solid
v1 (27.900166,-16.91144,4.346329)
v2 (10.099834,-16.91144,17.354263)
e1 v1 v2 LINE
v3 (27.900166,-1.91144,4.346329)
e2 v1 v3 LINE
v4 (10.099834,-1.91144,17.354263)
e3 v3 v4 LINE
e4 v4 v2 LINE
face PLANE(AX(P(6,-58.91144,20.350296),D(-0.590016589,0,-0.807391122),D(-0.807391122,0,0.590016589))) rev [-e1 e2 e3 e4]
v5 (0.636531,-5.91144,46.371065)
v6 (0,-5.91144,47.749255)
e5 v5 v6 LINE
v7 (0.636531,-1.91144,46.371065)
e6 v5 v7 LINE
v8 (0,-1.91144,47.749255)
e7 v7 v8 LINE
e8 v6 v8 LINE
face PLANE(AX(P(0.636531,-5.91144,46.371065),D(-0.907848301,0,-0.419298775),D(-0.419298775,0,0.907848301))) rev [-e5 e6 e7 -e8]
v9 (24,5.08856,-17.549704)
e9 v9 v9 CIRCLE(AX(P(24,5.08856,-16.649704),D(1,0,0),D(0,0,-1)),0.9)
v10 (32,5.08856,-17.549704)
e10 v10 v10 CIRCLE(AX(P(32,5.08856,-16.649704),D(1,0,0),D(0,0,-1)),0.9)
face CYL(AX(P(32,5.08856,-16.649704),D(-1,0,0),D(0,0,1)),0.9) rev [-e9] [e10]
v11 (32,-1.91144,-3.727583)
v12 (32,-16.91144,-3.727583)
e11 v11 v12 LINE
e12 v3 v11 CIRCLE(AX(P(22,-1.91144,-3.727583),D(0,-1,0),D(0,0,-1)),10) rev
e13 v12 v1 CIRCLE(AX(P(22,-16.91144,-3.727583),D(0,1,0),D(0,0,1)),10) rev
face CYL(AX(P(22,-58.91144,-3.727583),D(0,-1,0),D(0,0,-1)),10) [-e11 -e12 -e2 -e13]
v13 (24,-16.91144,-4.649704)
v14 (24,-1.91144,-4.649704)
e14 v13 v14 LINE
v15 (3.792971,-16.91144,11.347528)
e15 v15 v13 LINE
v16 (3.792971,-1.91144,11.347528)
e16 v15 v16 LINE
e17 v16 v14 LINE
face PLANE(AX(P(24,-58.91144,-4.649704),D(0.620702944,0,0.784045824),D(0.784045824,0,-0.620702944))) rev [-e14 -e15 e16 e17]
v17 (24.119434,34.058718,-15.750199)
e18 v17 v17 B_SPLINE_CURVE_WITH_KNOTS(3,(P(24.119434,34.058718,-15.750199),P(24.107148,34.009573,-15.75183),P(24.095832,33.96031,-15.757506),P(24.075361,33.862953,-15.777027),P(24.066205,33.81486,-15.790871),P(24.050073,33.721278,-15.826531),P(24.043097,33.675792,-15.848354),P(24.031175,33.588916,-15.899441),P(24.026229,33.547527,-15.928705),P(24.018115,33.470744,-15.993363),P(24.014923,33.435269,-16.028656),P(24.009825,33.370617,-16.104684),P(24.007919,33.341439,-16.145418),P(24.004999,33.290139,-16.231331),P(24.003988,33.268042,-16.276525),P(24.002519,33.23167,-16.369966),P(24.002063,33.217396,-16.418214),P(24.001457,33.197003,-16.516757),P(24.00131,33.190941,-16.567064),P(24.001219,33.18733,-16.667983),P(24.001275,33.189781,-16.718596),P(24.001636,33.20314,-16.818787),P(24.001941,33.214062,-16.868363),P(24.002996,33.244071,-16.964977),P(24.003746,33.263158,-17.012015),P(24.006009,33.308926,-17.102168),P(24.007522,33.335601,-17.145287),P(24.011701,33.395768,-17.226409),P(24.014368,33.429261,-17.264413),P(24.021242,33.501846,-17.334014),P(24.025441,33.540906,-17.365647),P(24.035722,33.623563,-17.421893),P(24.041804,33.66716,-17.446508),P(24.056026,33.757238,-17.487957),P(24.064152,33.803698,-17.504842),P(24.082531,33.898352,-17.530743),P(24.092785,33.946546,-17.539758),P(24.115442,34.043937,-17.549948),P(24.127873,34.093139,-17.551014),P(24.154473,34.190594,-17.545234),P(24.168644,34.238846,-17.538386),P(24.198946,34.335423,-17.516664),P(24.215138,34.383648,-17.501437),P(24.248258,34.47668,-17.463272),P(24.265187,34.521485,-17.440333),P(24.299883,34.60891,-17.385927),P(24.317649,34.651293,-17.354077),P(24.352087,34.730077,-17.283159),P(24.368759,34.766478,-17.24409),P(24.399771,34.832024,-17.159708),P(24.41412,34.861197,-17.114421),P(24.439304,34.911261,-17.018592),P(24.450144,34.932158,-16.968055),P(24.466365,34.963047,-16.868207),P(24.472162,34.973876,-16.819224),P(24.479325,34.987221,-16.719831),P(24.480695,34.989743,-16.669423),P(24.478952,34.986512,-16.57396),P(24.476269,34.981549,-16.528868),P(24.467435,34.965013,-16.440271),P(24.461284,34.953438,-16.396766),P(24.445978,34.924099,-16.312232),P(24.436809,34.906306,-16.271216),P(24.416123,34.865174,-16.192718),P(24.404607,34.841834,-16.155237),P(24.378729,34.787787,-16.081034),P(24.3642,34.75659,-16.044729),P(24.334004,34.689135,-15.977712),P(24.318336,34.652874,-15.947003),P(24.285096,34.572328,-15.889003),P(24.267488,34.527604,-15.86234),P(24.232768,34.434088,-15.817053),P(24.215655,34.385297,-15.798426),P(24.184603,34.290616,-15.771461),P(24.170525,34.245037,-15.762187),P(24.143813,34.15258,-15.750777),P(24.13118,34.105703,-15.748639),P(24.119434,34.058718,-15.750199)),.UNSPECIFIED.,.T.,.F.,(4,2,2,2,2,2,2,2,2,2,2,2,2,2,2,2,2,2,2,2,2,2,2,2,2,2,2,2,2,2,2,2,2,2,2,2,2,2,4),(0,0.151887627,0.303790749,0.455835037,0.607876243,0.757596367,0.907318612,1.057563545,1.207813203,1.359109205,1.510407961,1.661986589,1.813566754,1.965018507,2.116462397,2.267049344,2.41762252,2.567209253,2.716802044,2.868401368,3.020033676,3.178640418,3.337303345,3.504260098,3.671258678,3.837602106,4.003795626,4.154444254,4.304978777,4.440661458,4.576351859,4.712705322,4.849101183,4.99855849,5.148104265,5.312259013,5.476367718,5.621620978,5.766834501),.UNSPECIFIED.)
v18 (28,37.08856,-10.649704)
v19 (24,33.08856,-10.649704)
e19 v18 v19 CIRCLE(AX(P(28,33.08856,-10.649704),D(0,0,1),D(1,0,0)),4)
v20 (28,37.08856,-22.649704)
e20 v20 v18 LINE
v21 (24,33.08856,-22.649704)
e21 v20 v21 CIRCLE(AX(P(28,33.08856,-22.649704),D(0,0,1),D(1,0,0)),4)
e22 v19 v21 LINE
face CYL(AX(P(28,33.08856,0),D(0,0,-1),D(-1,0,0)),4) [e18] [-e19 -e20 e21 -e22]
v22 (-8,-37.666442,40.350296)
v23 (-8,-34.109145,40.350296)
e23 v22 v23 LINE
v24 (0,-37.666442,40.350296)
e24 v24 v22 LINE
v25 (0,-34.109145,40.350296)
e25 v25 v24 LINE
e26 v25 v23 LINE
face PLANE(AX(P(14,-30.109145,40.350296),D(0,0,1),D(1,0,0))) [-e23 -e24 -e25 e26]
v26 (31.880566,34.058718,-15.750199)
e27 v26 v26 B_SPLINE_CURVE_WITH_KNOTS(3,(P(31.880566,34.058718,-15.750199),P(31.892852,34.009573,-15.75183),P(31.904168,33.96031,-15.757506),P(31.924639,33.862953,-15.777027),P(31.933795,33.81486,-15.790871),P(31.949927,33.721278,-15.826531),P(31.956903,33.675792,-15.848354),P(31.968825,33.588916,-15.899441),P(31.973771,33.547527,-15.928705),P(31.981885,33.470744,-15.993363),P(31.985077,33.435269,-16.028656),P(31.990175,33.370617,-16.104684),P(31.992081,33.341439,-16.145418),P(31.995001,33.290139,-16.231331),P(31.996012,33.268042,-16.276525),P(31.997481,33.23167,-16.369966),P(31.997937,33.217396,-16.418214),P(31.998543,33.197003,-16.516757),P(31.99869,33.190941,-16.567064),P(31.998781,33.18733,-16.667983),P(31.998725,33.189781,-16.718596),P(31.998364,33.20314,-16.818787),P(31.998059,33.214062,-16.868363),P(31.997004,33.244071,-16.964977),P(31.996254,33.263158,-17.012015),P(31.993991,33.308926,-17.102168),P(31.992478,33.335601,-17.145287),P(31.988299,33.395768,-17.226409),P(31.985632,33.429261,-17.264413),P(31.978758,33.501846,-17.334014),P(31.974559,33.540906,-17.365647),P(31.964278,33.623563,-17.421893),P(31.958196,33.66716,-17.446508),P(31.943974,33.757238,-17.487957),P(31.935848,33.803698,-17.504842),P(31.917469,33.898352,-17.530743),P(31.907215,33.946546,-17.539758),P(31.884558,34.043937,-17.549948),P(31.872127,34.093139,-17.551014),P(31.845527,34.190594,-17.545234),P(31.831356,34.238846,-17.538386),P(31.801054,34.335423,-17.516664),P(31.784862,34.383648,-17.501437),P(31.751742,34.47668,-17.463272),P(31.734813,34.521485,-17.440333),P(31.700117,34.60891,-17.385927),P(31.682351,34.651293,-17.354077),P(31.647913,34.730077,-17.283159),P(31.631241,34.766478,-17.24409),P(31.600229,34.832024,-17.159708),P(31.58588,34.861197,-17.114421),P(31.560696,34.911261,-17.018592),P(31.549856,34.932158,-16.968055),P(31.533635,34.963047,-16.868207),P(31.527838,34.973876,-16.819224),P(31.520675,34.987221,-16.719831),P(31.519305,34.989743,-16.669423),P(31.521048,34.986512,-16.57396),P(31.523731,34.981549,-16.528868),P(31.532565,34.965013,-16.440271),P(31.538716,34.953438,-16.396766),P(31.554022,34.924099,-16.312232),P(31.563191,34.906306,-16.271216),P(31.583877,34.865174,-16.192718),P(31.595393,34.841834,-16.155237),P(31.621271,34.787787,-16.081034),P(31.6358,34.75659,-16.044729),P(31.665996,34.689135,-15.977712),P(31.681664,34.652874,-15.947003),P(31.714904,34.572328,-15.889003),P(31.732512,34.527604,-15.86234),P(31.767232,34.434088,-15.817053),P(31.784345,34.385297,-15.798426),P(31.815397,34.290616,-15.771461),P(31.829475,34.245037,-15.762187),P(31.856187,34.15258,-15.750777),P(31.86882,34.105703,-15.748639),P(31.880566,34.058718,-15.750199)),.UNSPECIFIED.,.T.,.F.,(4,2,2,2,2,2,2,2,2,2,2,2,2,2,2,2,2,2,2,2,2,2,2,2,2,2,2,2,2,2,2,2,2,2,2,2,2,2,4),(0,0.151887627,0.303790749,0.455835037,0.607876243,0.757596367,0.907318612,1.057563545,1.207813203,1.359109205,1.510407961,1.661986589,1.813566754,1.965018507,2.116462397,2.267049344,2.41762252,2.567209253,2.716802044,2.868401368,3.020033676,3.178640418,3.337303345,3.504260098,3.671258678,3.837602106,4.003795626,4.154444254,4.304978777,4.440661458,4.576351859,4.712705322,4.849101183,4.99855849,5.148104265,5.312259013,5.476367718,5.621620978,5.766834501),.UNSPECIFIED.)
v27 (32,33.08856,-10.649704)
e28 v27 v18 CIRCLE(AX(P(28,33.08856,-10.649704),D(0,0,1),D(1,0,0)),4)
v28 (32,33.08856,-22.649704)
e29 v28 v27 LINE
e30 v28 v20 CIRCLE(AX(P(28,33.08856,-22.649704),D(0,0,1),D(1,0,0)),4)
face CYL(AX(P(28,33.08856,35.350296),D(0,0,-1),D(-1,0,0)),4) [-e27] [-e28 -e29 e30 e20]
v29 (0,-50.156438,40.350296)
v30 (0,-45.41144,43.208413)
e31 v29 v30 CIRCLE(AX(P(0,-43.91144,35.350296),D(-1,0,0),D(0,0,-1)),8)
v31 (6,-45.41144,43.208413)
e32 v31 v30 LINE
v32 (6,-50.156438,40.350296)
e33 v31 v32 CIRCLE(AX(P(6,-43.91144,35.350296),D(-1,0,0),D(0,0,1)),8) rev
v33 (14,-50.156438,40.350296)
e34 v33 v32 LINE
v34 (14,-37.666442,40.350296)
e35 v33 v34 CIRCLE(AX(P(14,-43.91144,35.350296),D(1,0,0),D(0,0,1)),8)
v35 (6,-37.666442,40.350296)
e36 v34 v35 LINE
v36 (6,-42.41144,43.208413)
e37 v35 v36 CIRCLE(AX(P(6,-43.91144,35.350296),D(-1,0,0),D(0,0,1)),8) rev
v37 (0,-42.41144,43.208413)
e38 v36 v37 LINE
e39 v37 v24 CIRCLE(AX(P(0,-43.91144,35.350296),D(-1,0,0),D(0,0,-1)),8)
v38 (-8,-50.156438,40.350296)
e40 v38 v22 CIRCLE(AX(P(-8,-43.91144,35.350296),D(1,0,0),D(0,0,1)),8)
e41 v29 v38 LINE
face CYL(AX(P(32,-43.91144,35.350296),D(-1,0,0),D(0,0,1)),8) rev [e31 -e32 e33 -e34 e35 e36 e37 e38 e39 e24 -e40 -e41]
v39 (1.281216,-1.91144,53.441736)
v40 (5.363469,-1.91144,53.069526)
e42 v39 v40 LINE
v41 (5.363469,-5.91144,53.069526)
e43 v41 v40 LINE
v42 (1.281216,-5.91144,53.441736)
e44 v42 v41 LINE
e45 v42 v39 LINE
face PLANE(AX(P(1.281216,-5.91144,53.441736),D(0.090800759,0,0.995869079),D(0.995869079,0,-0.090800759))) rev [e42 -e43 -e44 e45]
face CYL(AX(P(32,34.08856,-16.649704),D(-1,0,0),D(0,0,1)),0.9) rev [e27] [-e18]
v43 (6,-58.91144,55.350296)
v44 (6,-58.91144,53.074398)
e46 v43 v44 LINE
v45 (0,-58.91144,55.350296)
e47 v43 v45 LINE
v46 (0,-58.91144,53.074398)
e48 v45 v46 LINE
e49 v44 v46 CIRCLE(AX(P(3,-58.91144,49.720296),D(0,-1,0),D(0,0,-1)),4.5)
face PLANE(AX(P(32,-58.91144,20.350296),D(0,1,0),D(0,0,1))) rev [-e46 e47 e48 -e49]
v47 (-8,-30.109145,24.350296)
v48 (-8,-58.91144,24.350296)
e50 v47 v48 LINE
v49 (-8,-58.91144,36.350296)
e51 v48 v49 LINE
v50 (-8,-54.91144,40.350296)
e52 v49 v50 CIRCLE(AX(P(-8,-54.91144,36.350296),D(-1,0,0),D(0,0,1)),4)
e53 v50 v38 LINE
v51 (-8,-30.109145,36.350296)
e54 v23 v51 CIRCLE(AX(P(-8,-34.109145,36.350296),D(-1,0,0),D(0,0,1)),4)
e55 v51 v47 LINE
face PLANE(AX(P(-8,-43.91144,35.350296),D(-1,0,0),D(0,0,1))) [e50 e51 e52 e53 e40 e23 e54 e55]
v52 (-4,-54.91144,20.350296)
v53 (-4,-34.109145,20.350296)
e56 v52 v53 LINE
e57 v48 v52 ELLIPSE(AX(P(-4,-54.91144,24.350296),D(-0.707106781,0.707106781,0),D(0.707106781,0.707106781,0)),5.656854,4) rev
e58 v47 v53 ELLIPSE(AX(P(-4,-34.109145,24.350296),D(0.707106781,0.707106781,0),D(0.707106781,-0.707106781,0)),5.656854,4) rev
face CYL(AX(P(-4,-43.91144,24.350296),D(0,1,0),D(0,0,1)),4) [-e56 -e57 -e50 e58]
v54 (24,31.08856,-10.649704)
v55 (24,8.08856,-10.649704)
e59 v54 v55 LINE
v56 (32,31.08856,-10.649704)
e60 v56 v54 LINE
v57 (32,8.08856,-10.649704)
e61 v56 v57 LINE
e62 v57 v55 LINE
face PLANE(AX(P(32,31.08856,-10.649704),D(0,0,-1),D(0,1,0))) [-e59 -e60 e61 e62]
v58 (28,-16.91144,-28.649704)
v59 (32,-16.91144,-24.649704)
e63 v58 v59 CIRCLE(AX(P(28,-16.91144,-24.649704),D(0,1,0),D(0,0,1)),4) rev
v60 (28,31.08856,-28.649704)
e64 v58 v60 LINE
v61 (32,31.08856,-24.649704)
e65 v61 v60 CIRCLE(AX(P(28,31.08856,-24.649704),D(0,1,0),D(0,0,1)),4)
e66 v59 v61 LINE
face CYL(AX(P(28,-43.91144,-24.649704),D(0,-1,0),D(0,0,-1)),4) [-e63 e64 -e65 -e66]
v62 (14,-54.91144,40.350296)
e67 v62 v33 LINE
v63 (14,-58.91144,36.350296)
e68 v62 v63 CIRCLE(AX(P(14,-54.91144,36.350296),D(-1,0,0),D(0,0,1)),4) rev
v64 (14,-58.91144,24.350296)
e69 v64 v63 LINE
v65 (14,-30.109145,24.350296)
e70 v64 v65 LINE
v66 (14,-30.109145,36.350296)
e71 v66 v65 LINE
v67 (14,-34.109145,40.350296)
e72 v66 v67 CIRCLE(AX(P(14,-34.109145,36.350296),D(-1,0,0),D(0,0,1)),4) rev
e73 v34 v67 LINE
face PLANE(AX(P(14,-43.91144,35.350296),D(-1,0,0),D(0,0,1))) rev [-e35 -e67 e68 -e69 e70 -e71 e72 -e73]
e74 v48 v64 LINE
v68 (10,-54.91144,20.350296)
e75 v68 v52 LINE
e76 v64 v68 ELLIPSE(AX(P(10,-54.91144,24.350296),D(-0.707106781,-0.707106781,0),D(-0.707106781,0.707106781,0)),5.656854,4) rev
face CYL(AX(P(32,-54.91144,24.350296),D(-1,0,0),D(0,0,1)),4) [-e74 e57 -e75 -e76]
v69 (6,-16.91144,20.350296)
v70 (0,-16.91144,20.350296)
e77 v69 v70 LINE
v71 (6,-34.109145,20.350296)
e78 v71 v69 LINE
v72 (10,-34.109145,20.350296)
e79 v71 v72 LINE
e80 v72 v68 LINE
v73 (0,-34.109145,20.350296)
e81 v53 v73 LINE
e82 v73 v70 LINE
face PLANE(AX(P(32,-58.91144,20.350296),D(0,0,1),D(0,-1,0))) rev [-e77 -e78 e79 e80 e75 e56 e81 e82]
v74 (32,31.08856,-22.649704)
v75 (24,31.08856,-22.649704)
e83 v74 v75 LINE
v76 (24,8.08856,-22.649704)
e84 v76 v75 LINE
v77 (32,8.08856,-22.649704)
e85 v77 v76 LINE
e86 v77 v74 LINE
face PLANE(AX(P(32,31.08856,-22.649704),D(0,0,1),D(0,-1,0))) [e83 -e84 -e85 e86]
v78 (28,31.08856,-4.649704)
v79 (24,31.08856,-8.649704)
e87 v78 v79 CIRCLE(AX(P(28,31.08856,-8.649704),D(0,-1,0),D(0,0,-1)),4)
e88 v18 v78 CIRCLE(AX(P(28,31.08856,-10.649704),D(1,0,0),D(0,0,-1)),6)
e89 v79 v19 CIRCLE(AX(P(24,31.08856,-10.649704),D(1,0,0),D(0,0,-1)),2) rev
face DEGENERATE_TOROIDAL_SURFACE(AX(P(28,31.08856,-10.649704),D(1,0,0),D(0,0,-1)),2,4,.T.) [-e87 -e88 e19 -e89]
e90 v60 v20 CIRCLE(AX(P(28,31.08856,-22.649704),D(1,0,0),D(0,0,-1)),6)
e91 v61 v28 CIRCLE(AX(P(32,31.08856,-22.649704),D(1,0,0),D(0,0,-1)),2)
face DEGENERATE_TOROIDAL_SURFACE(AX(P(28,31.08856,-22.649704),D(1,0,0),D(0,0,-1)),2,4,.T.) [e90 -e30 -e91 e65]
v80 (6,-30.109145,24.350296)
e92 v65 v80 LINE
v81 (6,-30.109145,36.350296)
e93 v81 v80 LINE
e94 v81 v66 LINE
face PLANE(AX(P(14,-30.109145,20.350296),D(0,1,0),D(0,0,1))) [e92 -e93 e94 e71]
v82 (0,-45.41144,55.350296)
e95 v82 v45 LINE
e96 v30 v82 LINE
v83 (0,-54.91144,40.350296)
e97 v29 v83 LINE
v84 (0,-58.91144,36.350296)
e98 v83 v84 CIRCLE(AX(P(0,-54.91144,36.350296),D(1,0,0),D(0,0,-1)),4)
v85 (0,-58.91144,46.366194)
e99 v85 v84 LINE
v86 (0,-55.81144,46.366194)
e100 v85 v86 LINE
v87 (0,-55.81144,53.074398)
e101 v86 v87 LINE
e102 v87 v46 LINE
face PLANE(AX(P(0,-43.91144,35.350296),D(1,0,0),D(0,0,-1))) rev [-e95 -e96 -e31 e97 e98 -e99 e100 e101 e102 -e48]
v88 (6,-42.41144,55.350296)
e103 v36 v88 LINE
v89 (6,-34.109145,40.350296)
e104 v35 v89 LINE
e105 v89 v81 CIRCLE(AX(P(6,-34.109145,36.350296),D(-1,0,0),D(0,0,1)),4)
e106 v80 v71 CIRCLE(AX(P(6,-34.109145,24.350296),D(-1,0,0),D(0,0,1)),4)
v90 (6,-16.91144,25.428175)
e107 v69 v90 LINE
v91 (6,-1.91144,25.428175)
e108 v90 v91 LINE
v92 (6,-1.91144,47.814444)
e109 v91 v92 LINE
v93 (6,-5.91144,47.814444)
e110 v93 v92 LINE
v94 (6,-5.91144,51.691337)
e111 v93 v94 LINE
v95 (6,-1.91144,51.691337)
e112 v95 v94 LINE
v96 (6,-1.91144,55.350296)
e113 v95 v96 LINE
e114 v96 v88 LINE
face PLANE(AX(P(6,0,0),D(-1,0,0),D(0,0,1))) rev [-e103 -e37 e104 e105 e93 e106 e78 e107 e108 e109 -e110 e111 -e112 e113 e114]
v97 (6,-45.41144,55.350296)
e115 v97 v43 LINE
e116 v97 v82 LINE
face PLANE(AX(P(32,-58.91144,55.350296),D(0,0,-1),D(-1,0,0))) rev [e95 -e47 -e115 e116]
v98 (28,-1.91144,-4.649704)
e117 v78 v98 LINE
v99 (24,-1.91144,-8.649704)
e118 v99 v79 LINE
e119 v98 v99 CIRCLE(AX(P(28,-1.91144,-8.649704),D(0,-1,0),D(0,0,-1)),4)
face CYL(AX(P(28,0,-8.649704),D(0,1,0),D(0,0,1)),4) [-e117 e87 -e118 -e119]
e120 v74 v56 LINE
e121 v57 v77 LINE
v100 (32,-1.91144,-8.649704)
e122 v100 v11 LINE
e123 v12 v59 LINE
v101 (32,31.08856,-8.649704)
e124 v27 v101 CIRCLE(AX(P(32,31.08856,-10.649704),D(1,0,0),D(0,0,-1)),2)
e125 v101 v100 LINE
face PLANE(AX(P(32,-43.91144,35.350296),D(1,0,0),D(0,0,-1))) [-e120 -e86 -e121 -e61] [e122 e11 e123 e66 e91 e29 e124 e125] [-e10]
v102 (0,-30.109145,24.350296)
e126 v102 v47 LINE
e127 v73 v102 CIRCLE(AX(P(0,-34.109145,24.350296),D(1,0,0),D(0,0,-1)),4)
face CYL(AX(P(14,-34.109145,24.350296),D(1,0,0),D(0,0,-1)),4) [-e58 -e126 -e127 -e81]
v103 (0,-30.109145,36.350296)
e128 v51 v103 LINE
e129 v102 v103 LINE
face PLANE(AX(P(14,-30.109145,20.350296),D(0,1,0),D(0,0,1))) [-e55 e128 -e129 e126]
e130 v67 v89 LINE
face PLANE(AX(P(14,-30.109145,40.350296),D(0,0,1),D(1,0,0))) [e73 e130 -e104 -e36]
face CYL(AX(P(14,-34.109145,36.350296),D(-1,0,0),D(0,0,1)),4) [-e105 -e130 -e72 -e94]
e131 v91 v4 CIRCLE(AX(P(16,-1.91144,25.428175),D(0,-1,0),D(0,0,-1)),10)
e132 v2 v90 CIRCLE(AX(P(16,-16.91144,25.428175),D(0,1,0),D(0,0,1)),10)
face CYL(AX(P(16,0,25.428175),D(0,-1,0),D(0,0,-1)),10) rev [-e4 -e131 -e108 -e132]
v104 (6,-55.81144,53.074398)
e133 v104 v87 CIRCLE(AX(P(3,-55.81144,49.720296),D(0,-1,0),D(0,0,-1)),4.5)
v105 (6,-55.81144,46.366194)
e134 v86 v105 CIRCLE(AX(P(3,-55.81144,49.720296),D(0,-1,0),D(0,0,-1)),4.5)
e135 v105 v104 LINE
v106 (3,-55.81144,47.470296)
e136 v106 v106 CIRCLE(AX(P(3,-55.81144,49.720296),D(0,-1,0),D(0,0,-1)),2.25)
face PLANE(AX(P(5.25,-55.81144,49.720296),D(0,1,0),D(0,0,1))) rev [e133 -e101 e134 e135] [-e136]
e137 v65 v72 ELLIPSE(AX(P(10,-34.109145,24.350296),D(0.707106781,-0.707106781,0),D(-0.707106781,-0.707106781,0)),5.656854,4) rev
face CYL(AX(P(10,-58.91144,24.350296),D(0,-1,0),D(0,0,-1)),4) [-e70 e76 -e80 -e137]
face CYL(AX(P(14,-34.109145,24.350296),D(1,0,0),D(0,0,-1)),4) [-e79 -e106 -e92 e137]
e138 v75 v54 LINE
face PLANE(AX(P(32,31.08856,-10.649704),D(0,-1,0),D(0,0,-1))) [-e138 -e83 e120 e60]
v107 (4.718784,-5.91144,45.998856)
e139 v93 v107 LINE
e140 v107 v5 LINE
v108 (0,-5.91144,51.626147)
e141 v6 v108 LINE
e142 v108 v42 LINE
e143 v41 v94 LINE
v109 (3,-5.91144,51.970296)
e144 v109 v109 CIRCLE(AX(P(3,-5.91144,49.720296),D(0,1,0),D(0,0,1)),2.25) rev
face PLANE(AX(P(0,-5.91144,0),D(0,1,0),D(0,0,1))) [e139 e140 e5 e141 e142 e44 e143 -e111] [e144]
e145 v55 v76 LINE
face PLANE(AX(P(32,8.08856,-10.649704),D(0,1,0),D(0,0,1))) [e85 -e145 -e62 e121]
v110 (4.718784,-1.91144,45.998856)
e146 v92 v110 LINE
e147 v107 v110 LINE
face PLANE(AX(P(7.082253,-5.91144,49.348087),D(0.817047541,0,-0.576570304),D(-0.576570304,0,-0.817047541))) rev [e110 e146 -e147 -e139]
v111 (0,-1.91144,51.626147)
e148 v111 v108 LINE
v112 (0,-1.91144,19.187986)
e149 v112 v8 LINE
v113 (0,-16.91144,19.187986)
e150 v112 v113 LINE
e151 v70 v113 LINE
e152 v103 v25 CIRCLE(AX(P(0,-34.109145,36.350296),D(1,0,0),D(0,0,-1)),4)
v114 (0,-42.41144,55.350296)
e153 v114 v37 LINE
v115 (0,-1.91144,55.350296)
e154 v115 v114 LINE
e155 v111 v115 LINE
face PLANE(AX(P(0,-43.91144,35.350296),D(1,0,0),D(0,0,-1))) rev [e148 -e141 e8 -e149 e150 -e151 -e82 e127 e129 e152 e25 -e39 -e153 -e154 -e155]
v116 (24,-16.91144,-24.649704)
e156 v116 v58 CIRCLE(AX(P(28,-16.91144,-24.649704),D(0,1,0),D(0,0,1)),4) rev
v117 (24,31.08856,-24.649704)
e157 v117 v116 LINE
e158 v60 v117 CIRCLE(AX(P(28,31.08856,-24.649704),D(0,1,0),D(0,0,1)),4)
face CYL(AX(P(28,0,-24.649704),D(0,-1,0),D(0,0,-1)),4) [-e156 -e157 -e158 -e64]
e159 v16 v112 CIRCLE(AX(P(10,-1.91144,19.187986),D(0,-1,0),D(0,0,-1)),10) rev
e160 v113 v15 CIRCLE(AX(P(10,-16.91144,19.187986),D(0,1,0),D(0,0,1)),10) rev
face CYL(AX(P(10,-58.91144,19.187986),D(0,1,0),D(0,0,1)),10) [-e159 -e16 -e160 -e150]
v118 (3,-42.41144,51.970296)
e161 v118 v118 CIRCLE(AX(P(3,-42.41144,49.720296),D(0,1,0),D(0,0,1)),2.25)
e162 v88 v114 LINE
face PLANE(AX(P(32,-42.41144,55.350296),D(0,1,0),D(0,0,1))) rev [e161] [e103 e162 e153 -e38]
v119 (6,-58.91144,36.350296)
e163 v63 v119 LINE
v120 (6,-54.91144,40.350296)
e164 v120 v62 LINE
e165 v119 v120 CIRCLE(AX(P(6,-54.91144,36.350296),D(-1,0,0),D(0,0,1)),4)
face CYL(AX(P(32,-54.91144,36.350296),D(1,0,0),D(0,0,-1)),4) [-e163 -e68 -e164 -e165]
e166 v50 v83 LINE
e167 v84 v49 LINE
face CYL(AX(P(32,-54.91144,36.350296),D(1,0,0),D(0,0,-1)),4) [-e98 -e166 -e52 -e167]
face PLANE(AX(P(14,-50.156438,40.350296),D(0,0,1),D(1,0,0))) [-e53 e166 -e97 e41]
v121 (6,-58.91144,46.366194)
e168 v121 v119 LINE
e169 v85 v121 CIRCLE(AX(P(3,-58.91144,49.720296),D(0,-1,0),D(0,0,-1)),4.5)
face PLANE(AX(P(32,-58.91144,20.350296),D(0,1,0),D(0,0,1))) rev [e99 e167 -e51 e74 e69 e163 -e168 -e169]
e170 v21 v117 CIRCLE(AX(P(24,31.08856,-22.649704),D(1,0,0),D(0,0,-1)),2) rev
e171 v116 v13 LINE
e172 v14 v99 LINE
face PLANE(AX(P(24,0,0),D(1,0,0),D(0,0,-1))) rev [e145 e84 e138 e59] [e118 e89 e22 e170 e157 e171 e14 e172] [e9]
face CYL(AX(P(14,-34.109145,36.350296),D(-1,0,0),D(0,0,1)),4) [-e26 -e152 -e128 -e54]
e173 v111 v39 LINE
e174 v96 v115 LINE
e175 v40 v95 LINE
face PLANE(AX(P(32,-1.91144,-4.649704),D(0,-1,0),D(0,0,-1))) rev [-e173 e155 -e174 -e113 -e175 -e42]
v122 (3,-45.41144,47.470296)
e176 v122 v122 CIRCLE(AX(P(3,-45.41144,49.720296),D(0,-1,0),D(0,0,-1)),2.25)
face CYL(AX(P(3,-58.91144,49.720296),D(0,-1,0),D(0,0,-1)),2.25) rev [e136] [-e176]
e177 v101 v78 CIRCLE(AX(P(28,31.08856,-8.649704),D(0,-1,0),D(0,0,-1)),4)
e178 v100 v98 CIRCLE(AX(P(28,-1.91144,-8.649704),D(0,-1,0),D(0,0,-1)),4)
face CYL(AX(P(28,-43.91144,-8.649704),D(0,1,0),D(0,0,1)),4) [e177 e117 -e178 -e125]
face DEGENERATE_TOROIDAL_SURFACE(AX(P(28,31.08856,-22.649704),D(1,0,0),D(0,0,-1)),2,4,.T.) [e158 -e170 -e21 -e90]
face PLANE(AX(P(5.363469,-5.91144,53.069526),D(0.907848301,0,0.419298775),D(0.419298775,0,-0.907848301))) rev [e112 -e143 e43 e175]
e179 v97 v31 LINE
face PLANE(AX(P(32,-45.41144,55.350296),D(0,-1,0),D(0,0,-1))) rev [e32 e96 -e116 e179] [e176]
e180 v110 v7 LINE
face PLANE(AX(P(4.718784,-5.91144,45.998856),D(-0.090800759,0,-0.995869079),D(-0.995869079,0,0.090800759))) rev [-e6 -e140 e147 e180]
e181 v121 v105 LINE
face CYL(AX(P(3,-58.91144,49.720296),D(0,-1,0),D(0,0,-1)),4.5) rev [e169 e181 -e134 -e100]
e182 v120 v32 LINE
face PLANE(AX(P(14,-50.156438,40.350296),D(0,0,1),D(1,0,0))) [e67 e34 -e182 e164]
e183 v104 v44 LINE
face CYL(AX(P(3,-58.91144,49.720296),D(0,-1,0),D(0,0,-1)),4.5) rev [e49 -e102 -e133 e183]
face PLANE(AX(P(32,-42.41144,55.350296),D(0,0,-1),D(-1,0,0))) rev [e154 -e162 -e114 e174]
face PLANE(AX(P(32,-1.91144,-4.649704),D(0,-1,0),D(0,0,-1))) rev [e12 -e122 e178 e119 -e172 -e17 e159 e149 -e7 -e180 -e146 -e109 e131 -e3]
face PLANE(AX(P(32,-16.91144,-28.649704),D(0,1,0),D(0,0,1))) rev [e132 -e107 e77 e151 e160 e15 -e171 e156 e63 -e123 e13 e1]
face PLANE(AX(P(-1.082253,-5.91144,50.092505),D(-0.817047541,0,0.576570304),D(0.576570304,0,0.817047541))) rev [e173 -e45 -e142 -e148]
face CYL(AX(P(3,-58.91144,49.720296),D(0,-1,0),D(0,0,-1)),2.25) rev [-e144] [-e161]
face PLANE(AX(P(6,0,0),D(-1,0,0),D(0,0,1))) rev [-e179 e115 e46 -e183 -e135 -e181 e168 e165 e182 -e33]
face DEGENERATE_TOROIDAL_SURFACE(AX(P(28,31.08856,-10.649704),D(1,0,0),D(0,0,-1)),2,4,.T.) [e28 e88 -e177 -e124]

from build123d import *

# Parameters (mm, degrees)
SKETCH1_R                                        = 0.9
SKETCH1_W                                        = 12
SKETCH1_H                                        = 23
BOSS_EXTRUDE1_DEPTH                              = 32
CBORE_FOR_M4_PAN_HEAD_MACHINE_SCREW2_D           = 4.5
CBORE_FOR_M4_PAN_HEAD_MACHINE_SCREW2_CBORE_D     = 9
CBORE_FOR_M4_PAN_HEAD_MACHINE_SCREW2_CBORE_DEPTH = 3.1
CUT_EXTRUDE2_DEPTH                               = 4
SKETCH9_W                                        = 35
SKETCH9_H                                        = 57
CUT_EXTRUDE3_DEPTH                               = 26
SKETCH10_W                                       = 24
SKETCH10_H                                       = 54
CUT_EXTRUDE4_DEPTH                               = 24
BOSS_EXTRUDE2_DEPTH                              = 8
BOSS_EXTRUDE2_DEPTH_BACK                         = 14
FILLET3_R                                        = 4
FILLET4_R                                        = 6
FILLET5_R                                        = 4
CUT_EXTRUDE5_DEPTH                               = 86.654277555
FILLET6_R                                        = 10


with BuildPart() as part:
    # Sketch1 → Boss-Extrude1 (new body)
    with BuildSketch(Plane(origin=(0, 0, 0), x_dir=(0, 0, -1), z_dir=(1, 0, 0))):
        with BuildLine():
            Line((-55.350295908, -42.411439664), (-43.208412731, -42.411439664))
            ThreePointArc((-43.208412731, -42.411439664), (-27.350295908, -43.911439664), (-43.208412731, -45.411439664))
            Line((-43.208412731, -45.411439664), (-55.350295908, -45.411439664))
            Line((-55.350295908, -45.411439664), (-55.350295908, -58.911439664))
            Line((-55.350295908, -58.911439664), (-20.350295908, -58.911439664))
            Line((-20.350295908, -58.911439664), (-20.350295908, -16.911439664))
            Line((-20.350295908, -16.911439664), (28.649704092, -16.911439664))
            Line((28.649704092, -16.911439664), (28.649704092, 37.088560336))
            Line((28.649704092, 37.088560336), (4.649704092, 37.088560336))
            Line((4.649704092, 37.088560336), (4.649704092, -1.911439664))
            Line((4.649704092, -1.911439664), (-55.350295908, -1.911439664))
            Line((-55.350295908, -1.911439664), (-55.350295908, -28.911439664))
            Line((-55.350295908, -28.911439664), (-55.350295908, -42.411439664))
        make_face()
        with Locations((16.649704092, 34.088560336)):
            Circle(SKETCH1_R, mode=Mode.SUBTRACT)
        with Locations((16.649704092, 5.088560336)):
            Circle(SKETCH1_R, mode=Mode.SUBTRACT)
        with Locations((16.649704092, 19.588560336)):
            Rectangle(SKETCH1_W, SKETCH1_H, mode=Mode.SUBTRACT)
    extrude(amount=BOSS_EXTRUDE1_DEPTH)

    # CBORE for M4 Pan Head Machine Screw2 (through all)
    with Locations(Plane(origin=(0, -58.911439664, 0), x_dir=(-1, 0, 0), z_dir=(0, -1, 0))):
        with Locations((-3, -49.720295908)):
            CounterBoreHole(CBORE_FOR_M4_PAN_HEAD_MACHINE_SCREW2_D / 2, CBORE_FOR_M4_PAN_HEAD_MACHINE_SCREW2_CBORE_D / 2, CBORE_FOR_M4_PAN_HEAD_MACHINE_SCREW2_CBORE_DEPTH)

    # Sketch7 → Cut-Extrude2 (cut)
    with BuildSketch(Plane(origin=(0, -1.911439664, 0), x_dir=(1, 0, 0), z_dir=(0, 1, 0))):
        Polygon((7.082253493, -49.348086624), (4.718784051, -45.998856036), (0.636530558, -46.37106532), (-1.082253493, -50.092505192), (1.281215949, -53.441735779), (5.363469442, -53.069526496), align=None)
    extrude(amount=-CUT_EXTRUDE2_DEPTH, mode=Mode.SUBTRACT)

    # Sketch9 → Cut-Extrude3 (cut)
    with BuildSketch(Plane(origin=(32, 0, 0), x_dir=(0, 0, -1), z_dir=(1, 0, 0))):
        with Locations((-37.850295908, -30.411439664)):
            Rectangle(SKETCH9_W, SKETCH9_H)
    extrude(amount=-CUT_EXTRUDE3_DEPTH, mode=Mode.SUBTRACT)

    # Sketch10 → Cut-Extrude4 (cut)
    with BuildSketch(Plane.ZY):
        with Locations((-16.649704092, 10.088560336)):
            Rectangle(SKETCH10_W, SKETCH10_H)
    extrude(amount=-CUT_EXTRUDE4_DEPTH, mode=Mode.SUBTRACT)

    # Sketch11 → Boss-Extrude2 (add, two sides: drawn at the far end of the back side and taken through both)
    with BuildSketch(Plane.ZY.offset(-BOSS_EXTRUDE2_DEPTH_BACK)):
        with BuildLine():
            Line((20.350295908, -30.109144798), (40.350295908, -30.109144798))
            Line((40.350295908, -30.109144798), (40.350295908, -37.666441665))
            ThreePointArc((40.350295908, -37.666441665), (27.350295908, -43.911439664), (40.350295908, -50.156437662))
            Line((40.350295908, -50.156437662), (40.350295908, -58.911439664))
            Line((40.350295908, -58.911439664), (20.350295908, -58.911439664))
            Line((20.350295908, -58.911439664), (20.350295908, -30.109144798))
        make_face()
    extrude(amount=BOSS_EXTRUDE2_DEPTH + BOSS_EXTRUDE2_DEPTH_BACK)

    # Fillet3
    fillet3_edges = [part.edges().sort_by_distance(p)[0] for p in [
        (3, -58.911439664, 20.350295908),
        (14, -44.510292231, 20.350295908),
        (-4, -30.109144798, 20.350295908),
        (10, -30.109144798, 20.350295908),
        (-4, -30.109144798, 40.350295908),
        (10, -30.109144798, 40.350295908),
        (-4, -58.911439664, 40.350295908),
        (10, -58.911439664, 40.350295908),
        (-8, -44.510292231, 20.350295908),
    ]]
    fillet(fillet3_edges, radius=FILLET3_R)

    # Fillet4
    fillet4_edges = [part.edges().sort_by_distance(p)[0] for p in [
        (28, 37.088560336, -4.649704092),
        (28, 37.088560336, -28.649704092),
    ]]
    fillet(fillet4_edges, radius=FILLET4_R)

    # Fillet5
    # the kernel refuses this fillet: 4 mm, written as the material it takes off along each edge
    with BuildSketch(Plane(origin=(32, 31.088560336, -4.649704092), x_dir=(-1, 0, 0), z_dir=(0, -1, 0)), Plane(origin=(24, -1.911439664, -4.649704092), x_dir=(1, 0, 0), z_dir=(0, 1, 0))) as fillet5_piece_1:
        with BuildLine():
            CenterArc((FILLET5_R, FILLET5_R), FILLET5_R, 180, 90)
            Line((0, FILLET5_R), (0, 0))
            Line((0, 0), (FILLET5_R, 0))
        make_face()
    extrude(amount=33, mode=Mode.SUBTRACT)
    with BuildSketch(Plane(origin=(32, 31.088560336, -10.649704092), x_dir=(0, 0, 1), z_dir=(0, -1, 0))) as fillet5_piece_2:
        with BuildLine():
            CenterArc((6 - FILLET5_R, FILLET5_R), FILLET5_R, 270, 90)
            Line((6 - FILLET5_R, 0), (6, 0))
            Line((6, 0), (6, FILLET5_R))
        make_face()
    revolve(axis=Axis((32, 31.088560336, -10.649704092), (-1, 0, 0)), revolution_arc=90, mode=Mode.SUBTRACT)
    with BuildSketch(Plane(origin=(32, 37.088560336, -22.649704092), x_dir=(0, -1, 0), z_dir=(0, 0, 1)), Plane(origin=(24, 37.088560336, -10.649704092), x_dir=(0, -1, 0), z_dir=(0, 0, -1))) as fillet5_piece_3:
        with BuildLine():
            CenterArc((FILLET5_R, -FILLET5_R), FILLET5_R, 90, 90)
            Line((0, -FILLET5_R), (0, 0))
            Line((0, 0), (FILLET5_R, 0))
        make_face()
    extrude(amount=12, mode=Mode.SUBTRACT)
    with BuildSketch(Plane(origin=(32, 31.088560336, -22.649704092), x_dir=(0, 1, 0), z_dir=(0, 0, 1))) as fillet5_piece_4:
        with BuildLine():
            CenterArc((6 - FILLET5_R, FILLET5_R), FILLET5_R, 270, 90)
            Line((6, FILLET5_R), (6, 0))
            Line((6, 0), (6 - FILLET5_R, 0))
        make_face()
    revolve(axis=Axis((32, 31.088560336, -22.649704092), (-1, 0, 0)), revolution_arc=90, mode=Mode.SUBTRACT)
    with BuildSketch(Plane(origin=(24, 31.088560336, -10.649704092), x_dir=(0, 0, 1), z_dir=(0, -1, 0))) as fillet5_piece_5:
        with BuildLine():
            CenterArc((6 - FILLET5_R, -FILLET5_R), FILLET5_R, 0, 90)
            Line((6, -FILLET5_R), (6, 0))
            Line((6, 0), (6 - FILLET5_R, 0))
        make_face()
    revolve(axis=Axis((24, 31.088560336, -10.649704092), (-1, 0, 0)), revolution_arc=90, mode=Mode.SUBTRACT)
    with BuildSketch(Plane(origin=(24, 31.088560336, -22.649704092), x_dir=(0, 1, 0), z_dir=(0, 0, 1))) as fillet5_piece_6:
        with BuildLine():
            CenterArc((6 - FILLET5_R, -FILLET5_R), FILLET5_R, 0, 90)
            Line((6, -FILLET5_R), (6, 0))
            Line((6, 0), (6 - FILLET5_R, 0))
        make_face()
    revolve(axis=Axis((24, 31.088560336, -22.649704092), (-1, 0, 0)), revolution_arc=90, mode=Mode.SUBTRACT)
    with BuildSketch(Plane(origin=(32, -26.911439664, -28.649704092), x_dir=(0, 0, 1), z_dir=(0, 1, 0)), Plane(origin=(24, 31.088560336, -28.649704092), x_dir=(0, 0, 1), z_dir=(0, -1, 0))) as fillet5_piece_7:
        with BuildLine():
            CenterArc((FILLET5_R, -FILLET5_R), FILLET5_R, 90, 90)
            Line((0, -FILLET5_R), (0, 0))
            Line((0, 0), (FILLET5_R, 0))
        make_face()
    extrude(amount=58, mode=Mode.SUBTRACT)

    # Sketch13 → Cut-Extrude5 (cut, through all)
    with BuildSketch(Plane(origin=(0, -1.911439664, 0), x_dir=(1, 0, 0), z_dir=(0, 1, 0))):
        Polygon((6, -20.350295908), (32, -1.350295908), (32, -20.350295908), align=None)
        Polygon((0, 4.649704092), (24, 4.649704092), (0, -14.350295908), align=None)
    extrude(amount=-CUT_EXTRUDE5_DEPTH, mode=Mode.SUBTRACT)

    # Fillet6
    fillet6_edges = [part.edges().sort_by_distance(p)[0] for p in [
        (6, -9.411439664, 20.350295908),
        (32, -9.411439664, 1.350295908),
        (0, -9.411439664, 14.350295908),
    ]]
    fillet(fillet6_edges, radius=FILLET6_R)


solid = part.part
